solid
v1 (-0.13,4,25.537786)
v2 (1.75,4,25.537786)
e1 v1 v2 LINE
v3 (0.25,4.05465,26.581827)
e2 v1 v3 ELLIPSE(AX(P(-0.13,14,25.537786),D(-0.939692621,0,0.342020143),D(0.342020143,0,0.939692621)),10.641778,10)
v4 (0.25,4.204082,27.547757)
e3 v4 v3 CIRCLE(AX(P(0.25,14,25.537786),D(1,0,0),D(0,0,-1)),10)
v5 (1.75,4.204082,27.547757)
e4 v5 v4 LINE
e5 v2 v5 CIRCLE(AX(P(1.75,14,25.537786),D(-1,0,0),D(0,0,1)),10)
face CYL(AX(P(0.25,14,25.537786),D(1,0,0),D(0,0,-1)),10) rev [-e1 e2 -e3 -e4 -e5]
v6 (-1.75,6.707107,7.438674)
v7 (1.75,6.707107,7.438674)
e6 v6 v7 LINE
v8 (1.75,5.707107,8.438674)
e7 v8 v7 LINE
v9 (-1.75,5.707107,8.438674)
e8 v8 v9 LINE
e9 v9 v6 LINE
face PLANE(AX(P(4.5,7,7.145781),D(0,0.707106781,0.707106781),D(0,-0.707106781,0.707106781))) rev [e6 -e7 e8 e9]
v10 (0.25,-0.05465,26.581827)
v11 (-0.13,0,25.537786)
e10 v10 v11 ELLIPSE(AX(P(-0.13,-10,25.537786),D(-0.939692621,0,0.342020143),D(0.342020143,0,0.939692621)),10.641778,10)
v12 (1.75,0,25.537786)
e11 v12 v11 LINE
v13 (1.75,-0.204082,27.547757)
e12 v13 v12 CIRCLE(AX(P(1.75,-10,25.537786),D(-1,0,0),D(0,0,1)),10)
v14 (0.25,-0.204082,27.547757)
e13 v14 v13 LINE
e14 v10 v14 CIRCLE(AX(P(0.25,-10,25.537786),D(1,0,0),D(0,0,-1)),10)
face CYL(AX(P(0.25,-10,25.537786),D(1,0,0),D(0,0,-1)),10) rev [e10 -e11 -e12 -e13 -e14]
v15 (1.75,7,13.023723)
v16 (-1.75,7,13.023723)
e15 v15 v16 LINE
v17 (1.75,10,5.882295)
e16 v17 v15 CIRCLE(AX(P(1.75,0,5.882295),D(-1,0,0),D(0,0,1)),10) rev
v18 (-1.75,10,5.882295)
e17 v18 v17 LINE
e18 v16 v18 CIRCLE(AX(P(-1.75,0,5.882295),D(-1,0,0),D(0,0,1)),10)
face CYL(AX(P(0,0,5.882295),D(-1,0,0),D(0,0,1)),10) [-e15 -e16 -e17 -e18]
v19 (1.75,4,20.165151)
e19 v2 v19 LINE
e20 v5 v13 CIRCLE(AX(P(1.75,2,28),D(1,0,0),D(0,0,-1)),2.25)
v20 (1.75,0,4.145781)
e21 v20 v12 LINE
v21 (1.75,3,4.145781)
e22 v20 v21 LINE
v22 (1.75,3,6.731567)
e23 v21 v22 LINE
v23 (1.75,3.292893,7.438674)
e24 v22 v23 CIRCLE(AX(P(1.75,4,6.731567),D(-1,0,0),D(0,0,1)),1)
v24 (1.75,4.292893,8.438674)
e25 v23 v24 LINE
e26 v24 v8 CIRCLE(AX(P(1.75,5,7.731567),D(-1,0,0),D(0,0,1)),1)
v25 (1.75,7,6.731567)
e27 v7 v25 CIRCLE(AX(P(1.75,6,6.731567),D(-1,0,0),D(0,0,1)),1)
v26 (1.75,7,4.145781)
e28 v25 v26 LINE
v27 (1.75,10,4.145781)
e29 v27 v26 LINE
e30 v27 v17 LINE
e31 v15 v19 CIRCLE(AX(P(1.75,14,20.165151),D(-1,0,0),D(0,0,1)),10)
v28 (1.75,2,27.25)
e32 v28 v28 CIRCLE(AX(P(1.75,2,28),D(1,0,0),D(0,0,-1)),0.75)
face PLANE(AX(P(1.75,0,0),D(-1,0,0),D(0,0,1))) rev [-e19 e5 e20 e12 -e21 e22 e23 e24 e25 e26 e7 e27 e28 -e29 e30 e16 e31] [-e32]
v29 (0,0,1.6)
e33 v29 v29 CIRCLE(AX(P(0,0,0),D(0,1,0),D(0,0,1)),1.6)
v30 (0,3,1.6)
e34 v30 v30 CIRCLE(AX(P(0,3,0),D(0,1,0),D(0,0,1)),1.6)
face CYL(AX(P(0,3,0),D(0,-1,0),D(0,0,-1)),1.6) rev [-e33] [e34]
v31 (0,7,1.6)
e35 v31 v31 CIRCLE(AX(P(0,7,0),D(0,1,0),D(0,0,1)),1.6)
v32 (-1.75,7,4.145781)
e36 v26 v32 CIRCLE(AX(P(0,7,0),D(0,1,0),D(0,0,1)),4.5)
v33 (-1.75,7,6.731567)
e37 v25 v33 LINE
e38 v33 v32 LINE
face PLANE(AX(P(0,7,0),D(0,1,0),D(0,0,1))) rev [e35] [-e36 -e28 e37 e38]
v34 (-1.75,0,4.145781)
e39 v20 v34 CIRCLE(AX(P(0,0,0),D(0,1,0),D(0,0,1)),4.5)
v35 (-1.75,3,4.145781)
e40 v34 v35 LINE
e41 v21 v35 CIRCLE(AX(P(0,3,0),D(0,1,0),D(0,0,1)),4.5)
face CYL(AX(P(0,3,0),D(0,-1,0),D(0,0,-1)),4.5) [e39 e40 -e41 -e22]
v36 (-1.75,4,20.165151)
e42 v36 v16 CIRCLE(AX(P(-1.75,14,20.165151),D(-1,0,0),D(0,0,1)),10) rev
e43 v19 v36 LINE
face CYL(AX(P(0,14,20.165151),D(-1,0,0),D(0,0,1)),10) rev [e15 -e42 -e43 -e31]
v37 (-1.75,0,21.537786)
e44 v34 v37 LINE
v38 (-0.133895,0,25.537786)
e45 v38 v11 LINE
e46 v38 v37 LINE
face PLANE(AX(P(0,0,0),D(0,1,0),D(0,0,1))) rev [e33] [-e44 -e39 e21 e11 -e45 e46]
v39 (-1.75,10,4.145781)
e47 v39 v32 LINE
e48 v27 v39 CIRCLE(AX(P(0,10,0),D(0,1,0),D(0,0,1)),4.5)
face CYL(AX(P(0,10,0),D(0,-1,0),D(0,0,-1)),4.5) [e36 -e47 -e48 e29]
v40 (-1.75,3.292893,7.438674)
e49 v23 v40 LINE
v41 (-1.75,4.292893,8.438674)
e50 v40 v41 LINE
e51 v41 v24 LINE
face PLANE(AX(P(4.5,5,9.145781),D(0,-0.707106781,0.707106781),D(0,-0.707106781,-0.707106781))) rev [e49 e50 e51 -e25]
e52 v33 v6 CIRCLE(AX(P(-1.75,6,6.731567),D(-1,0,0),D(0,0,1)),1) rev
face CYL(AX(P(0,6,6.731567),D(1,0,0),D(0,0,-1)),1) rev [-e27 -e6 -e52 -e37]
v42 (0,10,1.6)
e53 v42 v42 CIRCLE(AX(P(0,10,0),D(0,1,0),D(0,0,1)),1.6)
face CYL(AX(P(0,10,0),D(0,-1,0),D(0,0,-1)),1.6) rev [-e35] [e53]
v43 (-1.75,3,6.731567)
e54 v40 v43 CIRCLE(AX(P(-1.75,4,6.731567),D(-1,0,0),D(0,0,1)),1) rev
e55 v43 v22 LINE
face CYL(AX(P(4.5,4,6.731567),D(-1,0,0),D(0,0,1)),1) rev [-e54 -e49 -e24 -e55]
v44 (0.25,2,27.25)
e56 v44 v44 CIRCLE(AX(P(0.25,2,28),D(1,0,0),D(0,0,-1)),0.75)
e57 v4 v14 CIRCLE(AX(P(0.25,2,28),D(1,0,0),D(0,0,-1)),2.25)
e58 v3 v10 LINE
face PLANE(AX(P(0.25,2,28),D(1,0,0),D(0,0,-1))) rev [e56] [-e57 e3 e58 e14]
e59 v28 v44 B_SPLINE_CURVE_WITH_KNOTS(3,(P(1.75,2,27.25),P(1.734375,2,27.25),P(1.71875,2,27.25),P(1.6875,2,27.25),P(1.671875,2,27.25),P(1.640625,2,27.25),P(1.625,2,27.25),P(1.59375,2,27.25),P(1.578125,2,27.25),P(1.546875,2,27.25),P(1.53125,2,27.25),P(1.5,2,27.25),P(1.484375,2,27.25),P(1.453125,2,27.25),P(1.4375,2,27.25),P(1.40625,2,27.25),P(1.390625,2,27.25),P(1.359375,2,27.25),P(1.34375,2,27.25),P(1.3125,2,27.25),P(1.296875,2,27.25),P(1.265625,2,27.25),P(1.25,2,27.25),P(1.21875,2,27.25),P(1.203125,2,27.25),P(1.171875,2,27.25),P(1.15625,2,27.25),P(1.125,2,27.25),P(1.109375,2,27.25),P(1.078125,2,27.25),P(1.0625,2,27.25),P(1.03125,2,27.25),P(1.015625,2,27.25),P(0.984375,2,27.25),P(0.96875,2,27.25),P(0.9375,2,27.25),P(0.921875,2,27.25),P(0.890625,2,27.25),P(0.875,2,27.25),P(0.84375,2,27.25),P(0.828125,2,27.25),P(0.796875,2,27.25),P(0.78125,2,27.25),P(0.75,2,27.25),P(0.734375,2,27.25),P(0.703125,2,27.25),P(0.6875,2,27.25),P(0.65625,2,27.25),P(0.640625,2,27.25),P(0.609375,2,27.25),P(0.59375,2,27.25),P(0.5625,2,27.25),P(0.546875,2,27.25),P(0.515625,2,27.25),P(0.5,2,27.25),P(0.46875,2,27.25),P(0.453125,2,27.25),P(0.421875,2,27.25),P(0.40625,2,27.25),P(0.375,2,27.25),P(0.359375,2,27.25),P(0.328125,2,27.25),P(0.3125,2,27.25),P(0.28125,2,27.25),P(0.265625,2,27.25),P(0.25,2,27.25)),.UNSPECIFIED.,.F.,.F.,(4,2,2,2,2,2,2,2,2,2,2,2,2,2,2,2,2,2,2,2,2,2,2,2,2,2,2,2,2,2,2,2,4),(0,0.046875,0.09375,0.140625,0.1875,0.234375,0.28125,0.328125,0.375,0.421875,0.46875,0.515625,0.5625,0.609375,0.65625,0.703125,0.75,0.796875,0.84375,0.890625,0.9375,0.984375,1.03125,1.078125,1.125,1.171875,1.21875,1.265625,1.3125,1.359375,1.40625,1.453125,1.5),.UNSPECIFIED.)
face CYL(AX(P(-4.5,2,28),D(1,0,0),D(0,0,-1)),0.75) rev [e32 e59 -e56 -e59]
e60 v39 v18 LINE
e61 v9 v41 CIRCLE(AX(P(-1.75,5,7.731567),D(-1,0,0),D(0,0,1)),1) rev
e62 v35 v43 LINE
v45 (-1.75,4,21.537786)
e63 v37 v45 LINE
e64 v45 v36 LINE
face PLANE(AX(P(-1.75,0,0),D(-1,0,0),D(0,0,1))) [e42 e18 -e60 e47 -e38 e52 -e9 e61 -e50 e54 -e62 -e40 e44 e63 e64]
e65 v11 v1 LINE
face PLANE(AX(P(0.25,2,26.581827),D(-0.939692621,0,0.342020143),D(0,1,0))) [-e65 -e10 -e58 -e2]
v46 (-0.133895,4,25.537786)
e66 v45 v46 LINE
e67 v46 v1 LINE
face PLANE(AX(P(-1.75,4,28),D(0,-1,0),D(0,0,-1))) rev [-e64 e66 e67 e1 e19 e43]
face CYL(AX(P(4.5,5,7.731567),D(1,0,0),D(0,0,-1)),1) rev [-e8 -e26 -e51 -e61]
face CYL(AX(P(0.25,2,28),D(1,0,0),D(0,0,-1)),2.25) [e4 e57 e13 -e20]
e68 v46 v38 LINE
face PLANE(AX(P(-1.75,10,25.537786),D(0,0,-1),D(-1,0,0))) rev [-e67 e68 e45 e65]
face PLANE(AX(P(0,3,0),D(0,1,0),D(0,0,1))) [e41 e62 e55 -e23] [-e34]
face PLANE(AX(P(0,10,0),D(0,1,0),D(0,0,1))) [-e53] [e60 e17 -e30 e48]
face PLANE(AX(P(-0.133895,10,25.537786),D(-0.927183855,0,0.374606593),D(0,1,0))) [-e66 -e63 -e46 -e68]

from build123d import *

# Parameters (mm, degrees)
SKETCH4_R           = 4.5
SKETCH4_R_2         = 1.6
BOSS_EXTRUDE3_DEPTH = 3
BOSS_EXTRUDE4_START = 4
SKETCH5_R           = 4.5
SKETCH5_R_2         = 1.6
BOSS_EXTRUDE4_DEPTH = 3
BOSS_EXTRUDE5_START = -10
BOSS_EXTRUDE5_DEPTH = 10
CUT_EXTRUDE1_DEPTH  = 17.126453423
SKETCH8_W           = 3.5
SKETCH8_H           = 4
BOSS_EXTRUDE6_DEPTH = 17
SKETCH9_R           = 0.75
CUT_EXTRUDE2_DEPTH  = 31.381943651
SKETCH10_R          = 2.25
SKETCH10_R_2        = 0.75
BOSS_EXTRUDE7_DEPTH = 1.5
FILLET1_R           = 10
FILLET2_R           = 10
FILLET3_R           = 1
SKETCH11_W          = 2
SKETCH11_H          = 2.46221445
CUT_EXTRUDE3_DEPTH  = 33.176272314
CHAMFER2_SIZE       = 4
CHAMFER2_SIZE2      = 1.616104903
CHAMFER3_SIZE       = 0.38
CHAMFER3_SIZE_2     = 1.044041419


with BuildPart() as part:
    # Sketch4 → Boss-Extrude3 (new body)
    with BuildSketch(Plane(origin=(0, 0, 0), x_dir=(1, 0, 0), z_dir=(0, 1, 0))):
        with Locations(Location((0, 0, 0), (0, 0, 270))):
            Circle(SKETCH4_R)
        with Locations(Location((0, 0, 0), (0, 0, 270))):
            Circle(SKETCH4_R_2, mode=Mode.SUBTRACT)
    extrude(amount=BOSS_EXTRUDE3_DEPTH)



with BuildPart() as body_2:
    # Sketch5 → Boss-Extrude4 (new body)
    with BuildSketch(Plane(origin=(0, 3, 0), x_dir=(1, 0, 0), z_dir=(0, 1, 0)).offset(BOSS_EXTRUDE4_START)):
        with Locations(Location((0, 0, 0), (0, 0, 270))):
            Circle(SKETCH5_R)
        with Locations(Location((0, 0, 0), (0, 0, 270))):
            Circle(SKETCH5_R_2, mode=Mode.SUBTRACT)
    extrude(amount=BOSS_EXTRUDE4_DEPTH)


with BuildPart() as part_1:
    add(part.part)

    add(body_2.part)  # Boss-Extrude5 merges body 2
    # Sketch6 → Boss-Extrude5 (add)
    with BuildSketch(Plane(origin=(0, 10, 0), x_dir=(1, 0, 0), z_dir=(0, 1, 0)).offset(BOSS_EXTRUDE5_START)):
        with BuildLine():
            ThreePointArc((1.75, -4.145780988), (0, -4.5), (-1.75, -4.145780988))
            Line((-1.75, -4.145780988), (-1.75, -11))
            Line((-1.75, -11), (1.75, -11))
            Line((1.75, -11), (1.75, -4.145780988))
        make_face()
    extrude(amount=BOSS_EXTRUDE5_DEPTH)

    # Sketch7 → Cut-Extrude1 (cut, through all)
    with BuildSketch(Plane.ZY.offset(1.75)):
        Polygon((4.145780988, 7), (4.145780988, 3), (7.145780988, 3), (9.145780988, 5), (7.145780988, 7), align=None)
    extrude(amount=-CUT_EXTRUDE1_DEPTH, mode=Mode.SUBTRACT)

    # Sketch8 → Boss-Extrude6 (add)
    with BuildSketch(Plane.XY.offset(11)):
        with Locations((0, 2)):
            Rectangle(SKETCH8_W, SKETCH8_H)
    extrude(amount=BOSS_EXTRUDE6_DEPTH)

    # Sketch9 → Cut-Extrude2 (cut, through all)
    with BuildSketch(Plane(origin=(1.75, 0, 0), x_dir=(0, 0, -1), z_dir=(1, 0, 0))):
        with Locations((-28, 2)):
            Circle(SKETCH9_R)
    extrude(amount=-CUT_EXTRUDE2_DEPTH, mode=Mode.SUBTRACT)

    # Sketch10 → Boss-Extrude7 (add)
    with BuildSketch(Plane(origin=(1.75, 0, 0), x_dir=(0, 0, -1), z_dir=(1, 0, 0))):
        with Locations((-28, 2)):
            Circle(SKETCH10_R)
        with Locations((-28, 2)):
            Circle(SKETCH10_R_2, mode=Mode.SUBTRACT)
    extrude(amount=-BOSS_EXTRUDE7_DEPTH)

    # Fillet1
    # the kernel refuses this fillet: 10 mm, written as the material it adds along each edge
    with BuildSketch(Plane(origin=(1.75, 4, 11), x_dir=(0, 1, 0), z_dir=(-1, 0, 0))) as fillet1_piece_1:
        with BuildLine():
            CenterArc((10, -9.16515139), FILLET1_R, 113.578178478, 66.421821522)
            Line((0, -9.16515139), (0, 0))
            Line((0, 0), (6, 0))
        make_face()
    extrude(amount=3.5)
    with BuildSketch(Plane(origin=(0.25, 4, 26.969223594), x_dir=(0, 0, -1), z_dir=(1, 0, 0))) as fillet1_piece_2:
        with BuildLine():
            CenterArc((1.431438044, 10), FILLET1_R, 258.404727341, 11.595272659)
            ThreePointArc((-0.578532936, 0.204081633), (-0.282278366, 0.121850768), (0, 0))
            Line((0, 0), (1.431438044, 0))
        make_face()
    extrude(amount=1.5)
    with BuildSketch(Plane(origin=(0.25, 0, 26.969223594), x_dir=(0, -0.33266579589081224, 0.9430447859165186), z_dir=(1, 0, 0))) as fillet1_piece_3:
        with BuildLine():
            CenterArc((1.976747775, 9.906638335), FILLET1_R, 250.569341445, 11.595272659)
            Line((-1.349910184, 0.476190476), (0, 0))
            ThreePointArc((0, 0), (0.306736724, 0.021006375), (0.613473447, 0))
        make_face()
    extrude(amount=1.5)

    # Fillet2
    fillet2_edges = [part_1.edges().sort_by_distance(p)[0] for p in [
        (0, 10, 11),
    ]]
    fillet(fillet2_edges, radius=FILLET2_R)

    # Fillet3
    fillet3_edges = [part_1.edges().sort_by_distance(p)[0] for p in [
        (0, 7, 7.145780988),
        (0, 5, 9.145780988),
        (0, 3, 7.145780988),
    ]]
    fillet(fillet3_edges, radius=FILLET3_R)

    # Sketch11 → Cut-Extrude3 (cut, through all)
    with BuildSketch(Plane.XZ):
        with Locations((-0.75, 26.768892775)):
            Rectangle(SKETCH11_W, SKETCH11_H)
    extrude(amount=-CUT_EXTRUDE3_DEPTH, mode=Mode.SUBTRACT)

    # Chamfer2
    chamfer2_edges = [part_1.edges().sort_by_distance(p)[0] for p in [
        (-1.75, 2, 25.53778555),
    ]]
    chamfer2_side = [part_1.faces().sort_by_distance(p)[0] for p in [
        (-1.75, 3.550024841, 13.432455859),
    ]]
    chamfer(chamfer2_edges, length=CHAMFER2_SIZE, length2=CHAMFER2_SIZE2, reference=chamfer2_side[0])

    # Chamfer3
    # the kernel refuses this chamfer: 1.044041419, 0.38 mm, written as the material it adds along each edge
    with BuildSketch(Plane(origin=(0.25, -2.708446751, 25.53778555), x_dir=(-0.9950833631817484, 0, -0.09904090225205131), z_dir=(0, 1, 0))) as chamfer3_piece_1_section:
        Polygon((CHAMFER3_SIZE * 0.995083363182, CHAMFER3_SIZE * 0.0990409022521), (-CHAMFER3_SIZE_2 * 0.0990409022893, CHAMFER3_SIZE_2 * 0.995083363556), (0, 0), align=None)
    chamfer3_piece_1 = extrude(amount=9.416893502, mode=Mode.PRIVATE)
    chamfer3_piece_1 = chamfer3_piece_1 - Plane(origin=(0.195523629, 14, 25.53778555), x_dir=(0, 0, -1), z_dir=(-1, 0, 0)) * Cylinder(10, 23, mode=Mode.PRIVATE)
    chamfer3_piece_1 = chamfer3_piece_1 - Plane(origin=(0.195523629, -10, 25.53778555), x_dir=(0, -0.3326657958908282, 0.943044785916513), z_dir=(-1, 0, 0)) * Cylinder(10, 23, mode=Mode.PRIVATE)
    add(chamfer3_piece_1)


solid = part_1.part
